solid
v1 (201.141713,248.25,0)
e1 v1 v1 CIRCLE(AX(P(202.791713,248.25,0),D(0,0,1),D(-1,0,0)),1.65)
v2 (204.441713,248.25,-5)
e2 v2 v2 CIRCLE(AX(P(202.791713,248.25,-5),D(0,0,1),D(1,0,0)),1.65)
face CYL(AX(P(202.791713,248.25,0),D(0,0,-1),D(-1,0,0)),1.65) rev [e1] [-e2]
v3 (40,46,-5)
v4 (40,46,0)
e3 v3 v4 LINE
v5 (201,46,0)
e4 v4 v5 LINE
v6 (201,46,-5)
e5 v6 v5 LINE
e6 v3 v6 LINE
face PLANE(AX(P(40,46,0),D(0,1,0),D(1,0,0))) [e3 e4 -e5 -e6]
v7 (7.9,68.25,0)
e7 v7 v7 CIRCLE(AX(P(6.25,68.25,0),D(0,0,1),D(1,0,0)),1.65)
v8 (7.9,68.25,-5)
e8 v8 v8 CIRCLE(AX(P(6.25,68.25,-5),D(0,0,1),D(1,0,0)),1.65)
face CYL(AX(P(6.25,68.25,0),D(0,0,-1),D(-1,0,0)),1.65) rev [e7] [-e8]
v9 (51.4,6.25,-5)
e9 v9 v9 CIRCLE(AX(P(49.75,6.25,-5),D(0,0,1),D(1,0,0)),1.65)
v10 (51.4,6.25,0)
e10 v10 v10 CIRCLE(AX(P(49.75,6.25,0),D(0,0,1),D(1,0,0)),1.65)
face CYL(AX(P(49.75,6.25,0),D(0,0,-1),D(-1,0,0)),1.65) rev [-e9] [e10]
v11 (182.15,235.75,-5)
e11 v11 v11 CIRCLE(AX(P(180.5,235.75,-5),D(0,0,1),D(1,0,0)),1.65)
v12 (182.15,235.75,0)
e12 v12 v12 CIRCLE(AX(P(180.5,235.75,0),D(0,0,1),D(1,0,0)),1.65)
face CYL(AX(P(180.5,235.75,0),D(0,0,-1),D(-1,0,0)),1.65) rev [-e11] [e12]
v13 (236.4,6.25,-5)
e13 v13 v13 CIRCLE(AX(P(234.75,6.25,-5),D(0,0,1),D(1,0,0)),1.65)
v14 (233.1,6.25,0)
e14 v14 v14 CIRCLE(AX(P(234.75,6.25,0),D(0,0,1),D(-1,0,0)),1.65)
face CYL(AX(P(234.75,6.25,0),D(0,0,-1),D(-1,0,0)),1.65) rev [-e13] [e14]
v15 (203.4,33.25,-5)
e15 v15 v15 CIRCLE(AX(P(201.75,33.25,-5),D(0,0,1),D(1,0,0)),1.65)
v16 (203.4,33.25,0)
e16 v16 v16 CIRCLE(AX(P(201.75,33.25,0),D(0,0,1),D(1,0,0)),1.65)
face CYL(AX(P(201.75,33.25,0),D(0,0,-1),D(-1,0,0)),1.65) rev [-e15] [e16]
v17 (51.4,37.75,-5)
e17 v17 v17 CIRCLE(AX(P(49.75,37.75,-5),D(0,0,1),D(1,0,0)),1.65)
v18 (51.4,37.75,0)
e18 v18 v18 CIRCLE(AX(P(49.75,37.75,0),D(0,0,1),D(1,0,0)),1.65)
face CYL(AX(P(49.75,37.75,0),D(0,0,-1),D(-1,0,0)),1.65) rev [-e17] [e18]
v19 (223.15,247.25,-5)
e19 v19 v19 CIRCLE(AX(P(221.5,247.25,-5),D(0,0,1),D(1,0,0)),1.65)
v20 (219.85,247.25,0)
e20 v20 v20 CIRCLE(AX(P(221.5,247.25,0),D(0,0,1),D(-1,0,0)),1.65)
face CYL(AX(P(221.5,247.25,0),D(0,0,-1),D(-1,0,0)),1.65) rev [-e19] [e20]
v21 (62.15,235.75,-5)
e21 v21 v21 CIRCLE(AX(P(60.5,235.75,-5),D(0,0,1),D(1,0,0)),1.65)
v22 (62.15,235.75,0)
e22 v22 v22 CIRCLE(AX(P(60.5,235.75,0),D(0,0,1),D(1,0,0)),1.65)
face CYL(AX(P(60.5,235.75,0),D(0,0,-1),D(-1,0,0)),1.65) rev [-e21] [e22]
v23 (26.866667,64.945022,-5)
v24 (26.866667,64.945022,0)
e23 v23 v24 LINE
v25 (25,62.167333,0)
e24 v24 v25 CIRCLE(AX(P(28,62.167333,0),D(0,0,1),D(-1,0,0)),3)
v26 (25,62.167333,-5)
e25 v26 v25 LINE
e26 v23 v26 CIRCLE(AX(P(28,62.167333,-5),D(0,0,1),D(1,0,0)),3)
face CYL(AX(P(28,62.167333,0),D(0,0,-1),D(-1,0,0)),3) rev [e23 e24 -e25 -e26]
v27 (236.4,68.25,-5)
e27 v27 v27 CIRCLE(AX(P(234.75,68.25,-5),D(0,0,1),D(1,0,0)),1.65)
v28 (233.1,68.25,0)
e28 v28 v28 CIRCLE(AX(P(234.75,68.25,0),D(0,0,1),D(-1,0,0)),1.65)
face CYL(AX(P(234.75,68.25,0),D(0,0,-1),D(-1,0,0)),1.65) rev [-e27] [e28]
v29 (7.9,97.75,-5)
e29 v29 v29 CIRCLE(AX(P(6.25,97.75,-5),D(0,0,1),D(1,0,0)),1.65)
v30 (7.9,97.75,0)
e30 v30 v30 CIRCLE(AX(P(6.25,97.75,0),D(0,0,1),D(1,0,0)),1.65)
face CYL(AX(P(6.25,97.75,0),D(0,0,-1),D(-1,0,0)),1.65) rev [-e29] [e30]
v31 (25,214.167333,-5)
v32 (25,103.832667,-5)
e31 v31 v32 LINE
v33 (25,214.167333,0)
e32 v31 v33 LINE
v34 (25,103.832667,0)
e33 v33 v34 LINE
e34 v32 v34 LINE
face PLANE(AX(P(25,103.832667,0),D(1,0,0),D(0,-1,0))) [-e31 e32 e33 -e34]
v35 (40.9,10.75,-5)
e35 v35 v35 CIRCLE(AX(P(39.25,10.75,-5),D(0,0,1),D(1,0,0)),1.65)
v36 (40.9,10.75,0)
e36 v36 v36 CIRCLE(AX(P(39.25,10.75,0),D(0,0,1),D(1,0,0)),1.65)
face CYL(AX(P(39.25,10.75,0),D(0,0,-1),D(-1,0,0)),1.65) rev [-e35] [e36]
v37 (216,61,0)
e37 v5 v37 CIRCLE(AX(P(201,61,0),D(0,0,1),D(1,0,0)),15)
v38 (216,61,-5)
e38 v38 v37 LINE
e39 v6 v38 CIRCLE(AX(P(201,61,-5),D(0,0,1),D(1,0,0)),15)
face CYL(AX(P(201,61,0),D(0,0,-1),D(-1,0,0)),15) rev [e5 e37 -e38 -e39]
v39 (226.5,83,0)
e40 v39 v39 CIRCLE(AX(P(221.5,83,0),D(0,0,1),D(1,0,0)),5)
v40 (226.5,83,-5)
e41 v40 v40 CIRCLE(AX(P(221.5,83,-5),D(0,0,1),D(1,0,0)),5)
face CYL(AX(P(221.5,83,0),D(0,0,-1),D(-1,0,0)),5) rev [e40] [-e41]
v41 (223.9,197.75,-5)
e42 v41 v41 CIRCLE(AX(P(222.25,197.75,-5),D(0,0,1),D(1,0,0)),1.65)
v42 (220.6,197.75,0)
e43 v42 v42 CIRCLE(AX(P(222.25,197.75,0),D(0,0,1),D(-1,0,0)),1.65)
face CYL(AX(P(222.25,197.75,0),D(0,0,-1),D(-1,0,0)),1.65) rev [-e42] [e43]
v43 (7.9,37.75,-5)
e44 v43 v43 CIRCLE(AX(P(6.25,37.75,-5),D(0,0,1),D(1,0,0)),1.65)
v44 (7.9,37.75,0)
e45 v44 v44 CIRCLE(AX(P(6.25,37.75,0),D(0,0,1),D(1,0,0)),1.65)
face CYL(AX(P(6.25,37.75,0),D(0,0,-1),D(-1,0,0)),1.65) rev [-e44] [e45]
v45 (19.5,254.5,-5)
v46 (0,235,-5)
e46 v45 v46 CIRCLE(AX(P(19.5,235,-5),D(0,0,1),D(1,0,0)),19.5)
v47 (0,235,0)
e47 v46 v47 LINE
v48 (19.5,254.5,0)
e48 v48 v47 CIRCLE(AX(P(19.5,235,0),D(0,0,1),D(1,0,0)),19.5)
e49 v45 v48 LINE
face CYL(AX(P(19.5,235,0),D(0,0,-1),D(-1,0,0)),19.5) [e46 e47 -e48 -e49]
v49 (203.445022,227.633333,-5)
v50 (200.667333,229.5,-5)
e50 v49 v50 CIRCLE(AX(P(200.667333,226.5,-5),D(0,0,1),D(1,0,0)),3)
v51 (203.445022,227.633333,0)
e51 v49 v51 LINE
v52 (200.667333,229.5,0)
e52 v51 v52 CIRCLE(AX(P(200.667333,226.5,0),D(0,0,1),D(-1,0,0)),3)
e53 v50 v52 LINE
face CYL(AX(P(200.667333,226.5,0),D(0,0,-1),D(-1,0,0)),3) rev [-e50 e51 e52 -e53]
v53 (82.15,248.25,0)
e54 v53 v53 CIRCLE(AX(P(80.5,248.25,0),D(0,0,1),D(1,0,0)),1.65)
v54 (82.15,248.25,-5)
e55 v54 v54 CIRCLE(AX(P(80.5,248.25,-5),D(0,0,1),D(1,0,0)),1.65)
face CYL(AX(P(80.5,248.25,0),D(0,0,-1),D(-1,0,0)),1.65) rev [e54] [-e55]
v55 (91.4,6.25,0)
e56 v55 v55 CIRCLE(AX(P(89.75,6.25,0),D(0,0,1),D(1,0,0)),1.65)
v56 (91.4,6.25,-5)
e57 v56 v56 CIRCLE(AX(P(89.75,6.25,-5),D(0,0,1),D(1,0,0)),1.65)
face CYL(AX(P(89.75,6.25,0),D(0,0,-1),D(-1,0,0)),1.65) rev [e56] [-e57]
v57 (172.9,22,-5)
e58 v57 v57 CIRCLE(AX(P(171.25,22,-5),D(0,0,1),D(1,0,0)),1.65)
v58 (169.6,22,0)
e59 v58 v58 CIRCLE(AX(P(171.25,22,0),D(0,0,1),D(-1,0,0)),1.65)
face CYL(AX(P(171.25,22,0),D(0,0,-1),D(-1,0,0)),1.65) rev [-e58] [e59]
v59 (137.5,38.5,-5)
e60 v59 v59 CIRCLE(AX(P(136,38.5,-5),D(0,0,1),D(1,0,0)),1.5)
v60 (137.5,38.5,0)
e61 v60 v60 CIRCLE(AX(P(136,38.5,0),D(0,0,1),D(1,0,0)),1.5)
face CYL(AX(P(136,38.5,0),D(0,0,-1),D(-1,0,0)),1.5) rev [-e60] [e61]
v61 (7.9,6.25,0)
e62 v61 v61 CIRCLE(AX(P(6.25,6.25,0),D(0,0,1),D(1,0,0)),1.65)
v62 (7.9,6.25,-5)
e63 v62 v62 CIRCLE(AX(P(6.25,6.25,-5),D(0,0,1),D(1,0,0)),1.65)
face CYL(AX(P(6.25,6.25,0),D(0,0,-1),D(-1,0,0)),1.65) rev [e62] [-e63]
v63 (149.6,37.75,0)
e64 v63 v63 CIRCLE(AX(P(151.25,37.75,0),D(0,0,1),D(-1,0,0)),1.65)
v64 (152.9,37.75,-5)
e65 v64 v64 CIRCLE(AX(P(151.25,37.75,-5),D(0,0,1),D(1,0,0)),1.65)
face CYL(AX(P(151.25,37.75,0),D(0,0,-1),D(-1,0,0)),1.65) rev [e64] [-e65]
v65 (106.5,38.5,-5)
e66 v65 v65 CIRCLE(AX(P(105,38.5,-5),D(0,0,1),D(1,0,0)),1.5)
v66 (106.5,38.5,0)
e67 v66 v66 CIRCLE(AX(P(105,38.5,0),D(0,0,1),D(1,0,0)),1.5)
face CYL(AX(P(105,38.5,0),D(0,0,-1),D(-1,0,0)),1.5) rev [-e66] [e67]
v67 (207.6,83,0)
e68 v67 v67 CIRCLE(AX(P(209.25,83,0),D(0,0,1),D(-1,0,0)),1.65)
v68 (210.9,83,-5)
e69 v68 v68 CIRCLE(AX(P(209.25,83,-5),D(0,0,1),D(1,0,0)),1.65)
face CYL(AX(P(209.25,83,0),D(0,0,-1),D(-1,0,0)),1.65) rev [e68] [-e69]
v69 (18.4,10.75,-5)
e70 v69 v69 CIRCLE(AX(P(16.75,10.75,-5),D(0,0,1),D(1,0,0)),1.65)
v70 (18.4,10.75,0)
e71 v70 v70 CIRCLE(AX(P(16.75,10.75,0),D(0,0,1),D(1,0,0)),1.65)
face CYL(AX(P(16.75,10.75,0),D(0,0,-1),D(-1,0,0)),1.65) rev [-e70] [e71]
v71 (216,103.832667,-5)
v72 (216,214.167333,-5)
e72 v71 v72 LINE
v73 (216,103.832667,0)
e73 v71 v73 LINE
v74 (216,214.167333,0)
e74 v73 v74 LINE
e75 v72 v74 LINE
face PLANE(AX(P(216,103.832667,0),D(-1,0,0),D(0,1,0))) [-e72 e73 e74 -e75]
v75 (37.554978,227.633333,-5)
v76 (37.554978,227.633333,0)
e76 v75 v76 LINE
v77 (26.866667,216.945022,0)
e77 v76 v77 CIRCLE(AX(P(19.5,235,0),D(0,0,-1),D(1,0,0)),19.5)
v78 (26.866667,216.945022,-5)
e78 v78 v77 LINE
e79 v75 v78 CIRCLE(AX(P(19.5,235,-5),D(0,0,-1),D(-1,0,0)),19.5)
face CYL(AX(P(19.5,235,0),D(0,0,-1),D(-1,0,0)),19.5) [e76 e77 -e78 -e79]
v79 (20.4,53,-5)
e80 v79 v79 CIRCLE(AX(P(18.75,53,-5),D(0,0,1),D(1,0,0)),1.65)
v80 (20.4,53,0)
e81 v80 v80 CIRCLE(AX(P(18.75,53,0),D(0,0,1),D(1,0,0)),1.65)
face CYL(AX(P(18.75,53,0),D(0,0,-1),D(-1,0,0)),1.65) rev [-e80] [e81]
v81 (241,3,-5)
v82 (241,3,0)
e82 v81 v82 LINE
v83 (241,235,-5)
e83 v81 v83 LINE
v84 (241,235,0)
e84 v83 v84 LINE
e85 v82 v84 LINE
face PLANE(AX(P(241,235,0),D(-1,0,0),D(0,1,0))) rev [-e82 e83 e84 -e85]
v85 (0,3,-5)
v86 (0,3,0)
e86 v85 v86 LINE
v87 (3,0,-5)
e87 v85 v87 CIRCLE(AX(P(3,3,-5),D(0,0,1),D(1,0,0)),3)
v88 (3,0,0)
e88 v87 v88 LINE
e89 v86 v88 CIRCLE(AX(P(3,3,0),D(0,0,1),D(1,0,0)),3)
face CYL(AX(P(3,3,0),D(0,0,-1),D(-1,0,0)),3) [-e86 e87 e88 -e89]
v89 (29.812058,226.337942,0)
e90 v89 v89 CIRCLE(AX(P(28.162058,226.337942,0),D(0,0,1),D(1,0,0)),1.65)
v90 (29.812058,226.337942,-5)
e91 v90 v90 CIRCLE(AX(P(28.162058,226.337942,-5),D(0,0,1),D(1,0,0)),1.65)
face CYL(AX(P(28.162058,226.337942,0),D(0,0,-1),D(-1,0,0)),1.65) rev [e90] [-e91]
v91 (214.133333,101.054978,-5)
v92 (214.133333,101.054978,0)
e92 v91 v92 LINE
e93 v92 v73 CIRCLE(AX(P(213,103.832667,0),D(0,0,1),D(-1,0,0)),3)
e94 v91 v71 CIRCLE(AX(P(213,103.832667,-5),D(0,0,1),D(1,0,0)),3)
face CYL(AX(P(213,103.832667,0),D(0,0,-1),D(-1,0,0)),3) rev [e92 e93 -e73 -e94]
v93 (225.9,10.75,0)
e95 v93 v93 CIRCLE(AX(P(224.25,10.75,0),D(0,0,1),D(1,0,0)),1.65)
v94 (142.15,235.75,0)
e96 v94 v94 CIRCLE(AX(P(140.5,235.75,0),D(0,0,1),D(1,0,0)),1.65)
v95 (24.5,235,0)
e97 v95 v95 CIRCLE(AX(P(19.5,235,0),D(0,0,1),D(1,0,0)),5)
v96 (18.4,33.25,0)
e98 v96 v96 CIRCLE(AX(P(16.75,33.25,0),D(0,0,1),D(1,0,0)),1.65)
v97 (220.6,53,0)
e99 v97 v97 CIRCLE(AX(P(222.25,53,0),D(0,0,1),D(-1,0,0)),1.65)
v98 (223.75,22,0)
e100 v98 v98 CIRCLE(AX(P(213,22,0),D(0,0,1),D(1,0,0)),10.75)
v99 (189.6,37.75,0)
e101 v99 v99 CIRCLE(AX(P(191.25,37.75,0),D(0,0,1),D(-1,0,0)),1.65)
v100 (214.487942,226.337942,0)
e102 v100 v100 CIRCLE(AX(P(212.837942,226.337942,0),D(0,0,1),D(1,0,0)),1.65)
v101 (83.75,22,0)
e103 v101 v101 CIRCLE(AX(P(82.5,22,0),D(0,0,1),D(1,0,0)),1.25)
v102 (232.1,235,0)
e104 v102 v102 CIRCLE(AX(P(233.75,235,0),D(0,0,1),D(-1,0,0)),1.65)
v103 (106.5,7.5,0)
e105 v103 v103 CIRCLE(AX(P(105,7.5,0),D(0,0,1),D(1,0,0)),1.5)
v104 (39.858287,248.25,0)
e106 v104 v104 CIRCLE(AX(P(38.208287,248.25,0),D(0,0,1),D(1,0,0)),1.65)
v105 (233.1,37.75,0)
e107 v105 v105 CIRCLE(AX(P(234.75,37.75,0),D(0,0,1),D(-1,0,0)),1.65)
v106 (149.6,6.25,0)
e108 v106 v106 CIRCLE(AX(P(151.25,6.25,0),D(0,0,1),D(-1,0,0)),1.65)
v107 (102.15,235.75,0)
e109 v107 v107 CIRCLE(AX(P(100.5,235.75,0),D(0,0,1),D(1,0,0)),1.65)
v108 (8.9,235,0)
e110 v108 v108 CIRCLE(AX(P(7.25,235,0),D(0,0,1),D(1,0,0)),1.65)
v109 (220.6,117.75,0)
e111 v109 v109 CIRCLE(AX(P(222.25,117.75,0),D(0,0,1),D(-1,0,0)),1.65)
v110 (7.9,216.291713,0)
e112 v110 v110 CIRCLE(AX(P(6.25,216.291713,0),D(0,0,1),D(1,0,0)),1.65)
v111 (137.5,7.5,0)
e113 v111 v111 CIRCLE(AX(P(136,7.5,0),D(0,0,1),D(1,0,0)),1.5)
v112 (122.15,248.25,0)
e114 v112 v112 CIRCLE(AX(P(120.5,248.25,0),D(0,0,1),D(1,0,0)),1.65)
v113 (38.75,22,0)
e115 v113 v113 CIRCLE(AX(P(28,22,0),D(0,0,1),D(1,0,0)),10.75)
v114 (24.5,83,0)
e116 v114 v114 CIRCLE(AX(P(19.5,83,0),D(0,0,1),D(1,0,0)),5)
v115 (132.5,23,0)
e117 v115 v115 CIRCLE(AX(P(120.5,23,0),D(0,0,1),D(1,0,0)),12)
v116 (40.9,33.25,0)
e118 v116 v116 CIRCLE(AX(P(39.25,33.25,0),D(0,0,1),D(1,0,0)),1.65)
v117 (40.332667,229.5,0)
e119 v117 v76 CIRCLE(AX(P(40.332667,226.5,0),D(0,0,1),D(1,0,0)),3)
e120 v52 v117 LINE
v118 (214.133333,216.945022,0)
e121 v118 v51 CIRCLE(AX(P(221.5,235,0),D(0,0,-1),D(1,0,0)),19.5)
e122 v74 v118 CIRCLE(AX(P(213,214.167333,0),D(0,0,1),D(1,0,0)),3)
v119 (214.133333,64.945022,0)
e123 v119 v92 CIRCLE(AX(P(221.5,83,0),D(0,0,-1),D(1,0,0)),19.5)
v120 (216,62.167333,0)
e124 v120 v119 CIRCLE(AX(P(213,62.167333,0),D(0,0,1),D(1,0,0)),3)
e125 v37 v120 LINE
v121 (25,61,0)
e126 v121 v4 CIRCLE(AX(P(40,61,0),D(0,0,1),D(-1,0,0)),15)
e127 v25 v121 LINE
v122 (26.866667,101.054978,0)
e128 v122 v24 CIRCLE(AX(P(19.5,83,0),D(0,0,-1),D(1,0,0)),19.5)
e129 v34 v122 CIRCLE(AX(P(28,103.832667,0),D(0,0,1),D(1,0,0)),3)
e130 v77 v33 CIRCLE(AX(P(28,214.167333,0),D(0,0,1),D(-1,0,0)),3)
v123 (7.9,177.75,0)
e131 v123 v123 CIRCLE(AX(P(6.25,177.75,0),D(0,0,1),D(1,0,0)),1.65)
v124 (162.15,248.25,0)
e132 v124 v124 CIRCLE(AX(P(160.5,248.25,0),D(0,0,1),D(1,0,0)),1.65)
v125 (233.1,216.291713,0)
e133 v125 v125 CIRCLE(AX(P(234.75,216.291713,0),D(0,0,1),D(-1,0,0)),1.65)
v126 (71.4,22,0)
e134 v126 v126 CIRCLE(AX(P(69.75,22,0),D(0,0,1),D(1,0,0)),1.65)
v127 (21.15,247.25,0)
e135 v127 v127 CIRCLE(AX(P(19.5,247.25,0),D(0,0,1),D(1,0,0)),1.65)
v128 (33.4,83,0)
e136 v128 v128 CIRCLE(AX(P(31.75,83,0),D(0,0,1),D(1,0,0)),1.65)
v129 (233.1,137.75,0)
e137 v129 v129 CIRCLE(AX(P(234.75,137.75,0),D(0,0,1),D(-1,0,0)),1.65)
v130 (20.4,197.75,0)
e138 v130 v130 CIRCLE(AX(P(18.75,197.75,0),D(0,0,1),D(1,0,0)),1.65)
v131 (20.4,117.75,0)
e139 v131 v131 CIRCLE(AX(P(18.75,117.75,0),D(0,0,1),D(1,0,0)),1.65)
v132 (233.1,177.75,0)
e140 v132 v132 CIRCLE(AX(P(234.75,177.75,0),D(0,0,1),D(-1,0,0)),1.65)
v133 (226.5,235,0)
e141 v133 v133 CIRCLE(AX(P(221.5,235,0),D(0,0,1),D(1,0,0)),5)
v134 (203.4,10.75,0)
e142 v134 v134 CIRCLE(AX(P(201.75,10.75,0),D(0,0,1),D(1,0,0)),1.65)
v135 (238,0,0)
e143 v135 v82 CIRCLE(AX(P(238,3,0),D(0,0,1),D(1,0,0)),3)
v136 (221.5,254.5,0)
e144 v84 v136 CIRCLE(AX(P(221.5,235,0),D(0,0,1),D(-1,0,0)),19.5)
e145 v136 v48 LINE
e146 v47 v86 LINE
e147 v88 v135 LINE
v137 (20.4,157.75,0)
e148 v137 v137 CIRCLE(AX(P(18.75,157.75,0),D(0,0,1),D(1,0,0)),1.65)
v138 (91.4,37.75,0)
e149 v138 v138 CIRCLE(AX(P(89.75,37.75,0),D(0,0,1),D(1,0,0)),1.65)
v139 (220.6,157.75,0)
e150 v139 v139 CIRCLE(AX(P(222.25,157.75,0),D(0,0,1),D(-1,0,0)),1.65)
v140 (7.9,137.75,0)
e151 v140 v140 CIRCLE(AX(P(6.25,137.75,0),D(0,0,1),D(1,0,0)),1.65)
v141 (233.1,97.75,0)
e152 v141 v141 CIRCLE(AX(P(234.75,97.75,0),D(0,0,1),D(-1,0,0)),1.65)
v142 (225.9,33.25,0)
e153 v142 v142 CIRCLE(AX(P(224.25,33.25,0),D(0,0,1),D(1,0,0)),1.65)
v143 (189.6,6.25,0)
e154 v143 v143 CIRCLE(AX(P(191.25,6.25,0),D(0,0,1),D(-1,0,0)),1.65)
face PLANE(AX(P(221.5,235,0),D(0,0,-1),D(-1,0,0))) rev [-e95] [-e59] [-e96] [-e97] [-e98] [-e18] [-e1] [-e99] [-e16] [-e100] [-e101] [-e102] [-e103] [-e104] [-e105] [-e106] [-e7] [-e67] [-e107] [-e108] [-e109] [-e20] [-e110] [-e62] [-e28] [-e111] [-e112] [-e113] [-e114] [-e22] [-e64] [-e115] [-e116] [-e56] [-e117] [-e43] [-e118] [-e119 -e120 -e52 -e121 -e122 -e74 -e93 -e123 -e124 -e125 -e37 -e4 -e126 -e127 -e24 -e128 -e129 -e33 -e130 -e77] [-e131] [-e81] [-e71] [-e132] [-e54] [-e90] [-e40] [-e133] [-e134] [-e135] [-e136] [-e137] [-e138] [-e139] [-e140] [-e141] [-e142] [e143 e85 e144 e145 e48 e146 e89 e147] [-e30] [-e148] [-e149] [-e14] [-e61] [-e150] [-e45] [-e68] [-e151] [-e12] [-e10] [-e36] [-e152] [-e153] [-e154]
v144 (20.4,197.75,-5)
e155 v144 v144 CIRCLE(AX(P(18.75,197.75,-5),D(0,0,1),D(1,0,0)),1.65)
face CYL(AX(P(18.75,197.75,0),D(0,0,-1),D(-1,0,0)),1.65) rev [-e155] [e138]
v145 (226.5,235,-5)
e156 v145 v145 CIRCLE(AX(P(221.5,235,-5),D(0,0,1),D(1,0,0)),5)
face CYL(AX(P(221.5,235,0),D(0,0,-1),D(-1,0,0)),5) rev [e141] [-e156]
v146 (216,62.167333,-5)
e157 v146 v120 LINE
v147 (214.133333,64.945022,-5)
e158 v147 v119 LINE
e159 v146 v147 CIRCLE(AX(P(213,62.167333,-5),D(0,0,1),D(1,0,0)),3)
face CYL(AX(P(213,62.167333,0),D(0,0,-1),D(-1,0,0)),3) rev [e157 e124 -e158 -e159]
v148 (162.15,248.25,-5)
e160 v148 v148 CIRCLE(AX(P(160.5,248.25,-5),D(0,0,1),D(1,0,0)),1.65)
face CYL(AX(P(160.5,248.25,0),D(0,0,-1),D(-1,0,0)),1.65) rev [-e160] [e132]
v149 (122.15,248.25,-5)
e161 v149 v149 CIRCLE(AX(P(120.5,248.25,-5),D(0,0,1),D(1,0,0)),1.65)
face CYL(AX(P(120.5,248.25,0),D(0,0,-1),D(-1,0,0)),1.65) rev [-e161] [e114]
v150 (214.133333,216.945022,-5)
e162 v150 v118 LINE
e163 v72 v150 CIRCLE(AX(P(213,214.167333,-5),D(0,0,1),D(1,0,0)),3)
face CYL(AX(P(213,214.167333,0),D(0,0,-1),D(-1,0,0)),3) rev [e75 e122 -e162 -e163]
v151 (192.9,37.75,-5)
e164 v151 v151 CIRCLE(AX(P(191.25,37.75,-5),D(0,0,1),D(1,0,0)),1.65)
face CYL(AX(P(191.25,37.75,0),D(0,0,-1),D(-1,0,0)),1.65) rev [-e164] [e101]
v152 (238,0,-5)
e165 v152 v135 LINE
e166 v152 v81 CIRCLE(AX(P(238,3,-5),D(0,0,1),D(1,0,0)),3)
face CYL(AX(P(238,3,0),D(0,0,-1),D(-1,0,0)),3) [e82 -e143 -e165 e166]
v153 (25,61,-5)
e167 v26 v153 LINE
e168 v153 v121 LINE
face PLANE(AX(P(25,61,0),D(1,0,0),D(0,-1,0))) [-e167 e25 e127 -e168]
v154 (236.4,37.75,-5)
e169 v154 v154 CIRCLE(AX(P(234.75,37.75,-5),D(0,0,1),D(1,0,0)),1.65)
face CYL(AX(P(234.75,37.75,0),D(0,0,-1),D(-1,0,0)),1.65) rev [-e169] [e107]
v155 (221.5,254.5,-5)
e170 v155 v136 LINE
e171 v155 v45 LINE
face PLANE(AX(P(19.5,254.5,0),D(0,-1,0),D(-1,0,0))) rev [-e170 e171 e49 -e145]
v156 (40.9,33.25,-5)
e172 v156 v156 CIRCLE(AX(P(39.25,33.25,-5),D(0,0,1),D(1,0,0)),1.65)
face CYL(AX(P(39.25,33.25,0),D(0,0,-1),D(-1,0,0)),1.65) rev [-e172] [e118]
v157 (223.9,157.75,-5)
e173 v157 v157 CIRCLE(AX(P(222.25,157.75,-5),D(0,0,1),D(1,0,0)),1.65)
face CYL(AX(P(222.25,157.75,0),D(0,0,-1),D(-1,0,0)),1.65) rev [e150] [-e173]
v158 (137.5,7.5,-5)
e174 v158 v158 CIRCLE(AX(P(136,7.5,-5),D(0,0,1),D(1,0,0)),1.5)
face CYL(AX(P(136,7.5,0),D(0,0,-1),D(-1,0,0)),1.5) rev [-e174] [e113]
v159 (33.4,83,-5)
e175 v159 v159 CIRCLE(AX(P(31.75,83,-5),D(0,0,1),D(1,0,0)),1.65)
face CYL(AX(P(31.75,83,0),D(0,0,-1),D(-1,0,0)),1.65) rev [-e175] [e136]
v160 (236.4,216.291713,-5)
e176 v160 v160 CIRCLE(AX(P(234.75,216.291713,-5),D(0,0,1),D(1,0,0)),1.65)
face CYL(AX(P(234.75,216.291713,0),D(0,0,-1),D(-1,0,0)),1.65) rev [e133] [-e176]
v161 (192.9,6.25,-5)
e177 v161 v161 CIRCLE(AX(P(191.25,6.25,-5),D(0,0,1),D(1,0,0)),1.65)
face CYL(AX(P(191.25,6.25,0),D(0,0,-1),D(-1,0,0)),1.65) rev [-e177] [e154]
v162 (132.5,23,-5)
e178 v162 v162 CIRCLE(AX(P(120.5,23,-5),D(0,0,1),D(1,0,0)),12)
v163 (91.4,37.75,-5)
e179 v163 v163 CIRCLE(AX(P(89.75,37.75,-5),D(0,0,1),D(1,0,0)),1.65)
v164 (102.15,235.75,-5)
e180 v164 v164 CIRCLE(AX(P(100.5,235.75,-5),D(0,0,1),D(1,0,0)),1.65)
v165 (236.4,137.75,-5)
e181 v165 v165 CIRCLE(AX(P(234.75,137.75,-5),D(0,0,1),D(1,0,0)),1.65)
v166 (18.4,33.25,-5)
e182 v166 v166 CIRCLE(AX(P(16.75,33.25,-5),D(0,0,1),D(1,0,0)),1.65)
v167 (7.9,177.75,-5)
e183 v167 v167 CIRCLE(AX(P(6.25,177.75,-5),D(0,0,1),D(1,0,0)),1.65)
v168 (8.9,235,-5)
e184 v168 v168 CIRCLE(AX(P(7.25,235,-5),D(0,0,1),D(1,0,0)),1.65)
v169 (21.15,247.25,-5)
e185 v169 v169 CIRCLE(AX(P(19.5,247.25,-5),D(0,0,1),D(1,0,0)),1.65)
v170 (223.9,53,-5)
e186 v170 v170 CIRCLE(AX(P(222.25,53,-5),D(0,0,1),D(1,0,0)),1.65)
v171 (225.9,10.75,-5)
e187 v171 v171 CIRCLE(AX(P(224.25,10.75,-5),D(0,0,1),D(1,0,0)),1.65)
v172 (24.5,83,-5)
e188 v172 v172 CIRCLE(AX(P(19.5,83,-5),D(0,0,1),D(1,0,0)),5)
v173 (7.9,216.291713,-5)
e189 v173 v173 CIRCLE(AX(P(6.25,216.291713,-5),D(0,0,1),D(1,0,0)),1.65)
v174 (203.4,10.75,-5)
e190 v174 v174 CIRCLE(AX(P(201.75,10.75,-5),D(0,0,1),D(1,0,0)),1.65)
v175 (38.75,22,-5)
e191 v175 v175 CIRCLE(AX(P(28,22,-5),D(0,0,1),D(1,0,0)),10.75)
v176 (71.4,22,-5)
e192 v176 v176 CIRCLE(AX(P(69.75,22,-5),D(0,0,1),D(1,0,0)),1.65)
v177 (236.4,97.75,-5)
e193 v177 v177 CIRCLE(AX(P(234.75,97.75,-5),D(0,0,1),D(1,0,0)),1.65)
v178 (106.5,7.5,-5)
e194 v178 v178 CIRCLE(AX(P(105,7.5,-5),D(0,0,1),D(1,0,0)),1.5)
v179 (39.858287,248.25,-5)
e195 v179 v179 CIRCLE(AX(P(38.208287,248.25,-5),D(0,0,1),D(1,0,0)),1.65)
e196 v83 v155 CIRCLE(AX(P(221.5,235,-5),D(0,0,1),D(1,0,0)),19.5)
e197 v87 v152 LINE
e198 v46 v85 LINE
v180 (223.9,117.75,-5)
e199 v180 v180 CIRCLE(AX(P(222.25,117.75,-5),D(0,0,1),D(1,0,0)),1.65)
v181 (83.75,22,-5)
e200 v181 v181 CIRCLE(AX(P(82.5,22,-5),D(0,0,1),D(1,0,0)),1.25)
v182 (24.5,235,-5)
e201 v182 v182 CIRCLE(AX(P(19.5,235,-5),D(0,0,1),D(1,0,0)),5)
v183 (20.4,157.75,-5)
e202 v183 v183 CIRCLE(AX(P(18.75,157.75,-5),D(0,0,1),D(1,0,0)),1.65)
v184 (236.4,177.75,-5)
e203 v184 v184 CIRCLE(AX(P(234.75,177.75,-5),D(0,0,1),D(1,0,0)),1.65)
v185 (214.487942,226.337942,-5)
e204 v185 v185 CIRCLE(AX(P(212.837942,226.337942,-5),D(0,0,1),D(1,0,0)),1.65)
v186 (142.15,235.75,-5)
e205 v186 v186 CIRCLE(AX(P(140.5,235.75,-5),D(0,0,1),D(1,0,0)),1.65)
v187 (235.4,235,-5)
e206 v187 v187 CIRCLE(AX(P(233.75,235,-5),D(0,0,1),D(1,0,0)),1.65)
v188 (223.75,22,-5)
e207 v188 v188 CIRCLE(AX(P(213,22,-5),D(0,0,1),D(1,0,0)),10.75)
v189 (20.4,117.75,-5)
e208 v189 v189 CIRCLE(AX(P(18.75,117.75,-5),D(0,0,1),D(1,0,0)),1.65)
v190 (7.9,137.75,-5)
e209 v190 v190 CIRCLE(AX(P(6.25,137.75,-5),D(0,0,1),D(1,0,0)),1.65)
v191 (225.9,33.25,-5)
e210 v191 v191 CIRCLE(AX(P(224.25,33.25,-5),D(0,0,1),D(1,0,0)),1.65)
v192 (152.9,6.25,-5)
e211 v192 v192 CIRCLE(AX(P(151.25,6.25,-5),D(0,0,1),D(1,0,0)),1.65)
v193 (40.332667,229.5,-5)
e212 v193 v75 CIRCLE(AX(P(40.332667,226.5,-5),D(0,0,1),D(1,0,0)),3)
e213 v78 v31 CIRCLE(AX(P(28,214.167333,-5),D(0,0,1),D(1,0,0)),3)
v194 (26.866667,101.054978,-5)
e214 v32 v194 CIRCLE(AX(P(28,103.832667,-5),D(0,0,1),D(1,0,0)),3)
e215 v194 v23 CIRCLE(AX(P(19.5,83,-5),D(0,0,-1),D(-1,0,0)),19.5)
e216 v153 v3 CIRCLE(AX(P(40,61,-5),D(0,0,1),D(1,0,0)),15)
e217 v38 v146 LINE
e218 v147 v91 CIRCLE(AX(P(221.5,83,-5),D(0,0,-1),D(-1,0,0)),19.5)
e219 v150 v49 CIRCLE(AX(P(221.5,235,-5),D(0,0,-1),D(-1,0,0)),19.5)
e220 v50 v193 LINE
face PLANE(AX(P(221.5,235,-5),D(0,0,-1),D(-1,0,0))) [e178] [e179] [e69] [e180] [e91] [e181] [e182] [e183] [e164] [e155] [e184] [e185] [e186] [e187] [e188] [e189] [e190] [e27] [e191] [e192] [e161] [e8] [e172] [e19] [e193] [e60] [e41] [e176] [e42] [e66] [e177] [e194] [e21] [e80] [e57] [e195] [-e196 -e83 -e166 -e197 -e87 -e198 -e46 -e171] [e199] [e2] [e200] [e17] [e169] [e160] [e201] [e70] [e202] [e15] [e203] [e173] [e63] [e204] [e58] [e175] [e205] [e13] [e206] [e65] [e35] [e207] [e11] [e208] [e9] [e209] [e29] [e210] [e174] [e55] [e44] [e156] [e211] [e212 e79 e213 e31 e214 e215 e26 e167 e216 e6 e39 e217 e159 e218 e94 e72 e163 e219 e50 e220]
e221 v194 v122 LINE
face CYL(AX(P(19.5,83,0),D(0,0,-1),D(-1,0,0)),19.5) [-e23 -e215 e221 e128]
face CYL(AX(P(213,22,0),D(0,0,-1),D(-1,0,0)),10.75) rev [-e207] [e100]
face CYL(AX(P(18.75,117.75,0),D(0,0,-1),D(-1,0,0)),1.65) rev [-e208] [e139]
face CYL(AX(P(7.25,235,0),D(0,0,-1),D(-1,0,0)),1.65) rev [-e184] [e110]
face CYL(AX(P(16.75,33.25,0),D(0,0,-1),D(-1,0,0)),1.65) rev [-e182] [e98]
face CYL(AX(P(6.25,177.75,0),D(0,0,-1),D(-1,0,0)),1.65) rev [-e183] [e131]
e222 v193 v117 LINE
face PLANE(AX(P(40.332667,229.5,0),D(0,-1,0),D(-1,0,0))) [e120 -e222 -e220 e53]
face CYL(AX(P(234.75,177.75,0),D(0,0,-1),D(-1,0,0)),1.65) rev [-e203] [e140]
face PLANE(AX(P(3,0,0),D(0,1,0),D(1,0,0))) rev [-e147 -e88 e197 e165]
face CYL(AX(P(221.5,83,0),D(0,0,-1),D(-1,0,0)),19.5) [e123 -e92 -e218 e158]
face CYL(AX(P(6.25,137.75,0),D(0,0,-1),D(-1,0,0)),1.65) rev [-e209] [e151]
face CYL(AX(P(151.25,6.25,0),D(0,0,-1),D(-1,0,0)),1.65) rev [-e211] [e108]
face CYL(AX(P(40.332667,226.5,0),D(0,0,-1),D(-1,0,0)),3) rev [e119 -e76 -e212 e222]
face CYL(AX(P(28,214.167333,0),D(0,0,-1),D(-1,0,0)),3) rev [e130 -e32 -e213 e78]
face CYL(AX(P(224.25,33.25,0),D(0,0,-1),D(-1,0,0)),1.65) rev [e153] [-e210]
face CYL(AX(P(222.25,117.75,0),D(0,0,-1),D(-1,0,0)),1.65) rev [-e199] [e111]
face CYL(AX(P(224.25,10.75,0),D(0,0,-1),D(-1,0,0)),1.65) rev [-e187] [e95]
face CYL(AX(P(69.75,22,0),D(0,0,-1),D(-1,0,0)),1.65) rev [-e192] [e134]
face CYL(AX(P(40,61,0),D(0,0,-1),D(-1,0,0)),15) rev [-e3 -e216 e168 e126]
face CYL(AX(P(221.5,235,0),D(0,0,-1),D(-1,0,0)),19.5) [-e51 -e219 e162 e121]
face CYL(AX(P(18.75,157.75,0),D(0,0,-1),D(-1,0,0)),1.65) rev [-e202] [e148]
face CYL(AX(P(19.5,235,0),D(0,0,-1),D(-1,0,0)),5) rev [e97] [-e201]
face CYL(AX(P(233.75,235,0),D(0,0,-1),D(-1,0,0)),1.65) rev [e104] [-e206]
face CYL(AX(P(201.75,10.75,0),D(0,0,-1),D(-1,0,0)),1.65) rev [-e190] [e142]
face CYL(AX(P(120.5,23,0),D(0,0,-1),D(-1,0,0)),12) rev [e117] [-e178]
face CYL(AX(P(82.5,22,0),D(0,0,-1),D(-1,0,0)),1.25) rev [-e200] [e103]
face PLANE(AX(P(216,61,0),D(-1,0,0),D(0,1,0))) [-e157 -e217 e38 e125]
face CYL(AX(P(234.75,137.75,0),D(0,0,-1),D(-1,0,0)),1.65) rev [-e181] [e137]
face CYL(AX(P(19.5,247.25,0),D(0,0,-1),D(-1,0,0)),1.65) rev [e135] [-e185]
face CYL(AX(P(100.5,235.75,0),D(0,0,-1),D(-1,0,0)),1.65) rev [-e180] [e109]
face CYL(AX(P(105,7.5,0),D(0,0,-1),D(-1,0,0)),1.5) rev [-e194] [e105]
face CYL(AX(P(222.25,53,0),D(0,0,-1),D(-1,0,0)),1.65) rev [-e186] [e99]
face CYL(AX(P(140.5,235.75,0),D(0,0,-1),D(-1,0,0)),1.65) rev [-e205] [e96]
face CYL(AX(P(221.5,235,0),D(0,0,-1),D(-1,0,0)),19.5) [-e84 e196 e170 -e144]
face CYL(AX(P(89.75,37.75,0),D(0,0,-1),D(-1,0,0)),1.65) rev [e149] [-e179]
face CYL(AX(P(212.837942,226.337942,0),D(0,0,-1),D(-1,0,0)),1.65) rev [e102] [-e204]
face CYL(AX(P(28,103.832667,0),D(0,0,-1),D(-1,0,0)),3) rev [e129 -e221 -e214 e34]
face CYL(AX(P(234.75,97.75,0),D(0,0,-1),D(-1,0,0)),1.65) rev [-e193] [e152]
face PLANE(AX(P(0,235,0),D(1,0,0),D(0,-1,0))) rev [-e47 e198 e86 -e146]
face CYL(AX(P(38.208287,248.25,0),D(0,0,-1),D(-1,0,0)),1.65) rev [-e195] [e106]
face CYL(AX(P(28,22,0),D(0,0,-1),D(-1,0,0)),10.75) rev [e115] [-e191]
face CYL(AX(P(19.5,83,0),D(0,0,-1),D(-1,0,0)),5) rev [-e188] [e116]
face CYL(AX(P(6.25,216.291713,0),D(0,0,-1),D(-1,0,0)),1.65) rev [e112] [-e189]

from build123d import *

# Parameters (mm, degrees)
CONVERT_SOLID1_START       = -5
CONVERT_SOLID1_OUTLINE_R   = 1.65
CONVERT_SOLID1_OUTLINE_R_2 = 10.75
CONVERT_SOLID1_OUTLINE_R_3 = 1.25
CONVERT_SOLID1_OUTLINE_R_4 = 1.5
CONVERT_SOLID1_OUTLINE_R_5 = 5
CONVERT_SOLID1_OUTLINE_R_6 = 12
CONVERT_SOLID1_DEPTH       = 5


# Read off the part's stored shape, not the designer's step: Convert-Solid1
with BuildPart() as part:
    # Convert-Solid1 outline → Convert-Solid1 (new body)
    with BuildSketch(Plane.XY.offset(CONVERT_SOLID1_START)):
        with BuildLine():
            ThreePointArc((19.5, 254.5), (5.711417767, 248.788582233), (0, 235))
            Line((0, 235), (0, 3))
            ThreePointArc((0, 3), (0.878679656, 0.878679656), (3, 0))
            Line((3, 0), (238, 0))
            ThreePointArc((238, 0), (240.121320344, 0.878679656), (241, 3))
            Line((241, 3), (241, 235))
            ThreePointArc((241, 235), (235.288582233, 248.788582233), (221.5, 254.5))
            Line((221.5, 254.5), (19.5, 254.5))
        make_face()
        with Locations((6.25, 6.25)):
            Circle(CONVERT_SOLID1_OUTLINE_R, mode=Mode.SUBTRACT)
        with Locations((16.75, 10.75)):
            Circle(CONVERT_SOLID1_OUTLINE_R, mode=Mode.SUBTRACT)
        with Locations((28, 22)):
            Circle(CONVERT_SOLID1_OUTLINE_R_2, mode=Mode.SUBTRACT)
        with Locations((39.25, 10.75)):
            Circle(CONVERT_SOLID1_OUTLINE_R, mode=Mode.SUBTRACT)
        with Locations((49.75, 6.25)):
            Circle(CONVERT_SOLID1_OUTLINE_R, mode=Mode.SUBTRACT)
        with Locations((6.25, 37.75)):
            Circle(CONVERT_SOLID1_OUTLINE_R, mode=Mode.SUBTRACT)
        with Locations((16.75, 33.25)):
            Circle(CONVERT_SOLID1_OUTLINE_R, mode=Mode.SUBTRACT)
        with Locations((18.75, 53)):
            Circle(CONVERT_SOLID1_OUTLINE_R, mode=Mode.SUBTRACT)
        with Locations((39.25, 33.25)):
            Circle(CONVERT_SOLID1_OUTLINE_R, mode=Mode.SUBTRACT)
        with Locations((49.75, 37.75)):
            Circle(CONVERT_SOLID1_OUTLINE_R, mode=Mode.SUBTRACT)
        with Locations((89.75, 6.25)):
            Circle(CONVERT_SOLID1_OUTLINE_R, mode=Mode.SUBTRACT)
        with Locations((69.75, 22)):
            Circle(CONVERT_SOLID1_OUTLINE_R, mode=Mode.SUBTRACT)
        with Locations((82.5, 22)):
            Circle(CONVERT_SOLID1_OUTLINE_R_3, mode=Mode.SUBTRACT)
        with Locations((105, 7.5)):
            Circle(CONVERT_SOLID1_OUTLINE_R_4, mode=Mode.SUBTRACT)
        with Locations((89.75, 37.75)):
            Circle(CONVERT_SOLID1_OUTLINE_R, mode=Mode.SUBTRACT)
        with Locations((105, 38.5)):
            Circle(CONVERT_SOLID1_OUTLINE_R_4, mode=Mode.SUBTRACT)
        with Locations((6.25, 68.25)):
            Circle(CONVERT_SOLID1_OUTLINE_R, mode=Mode.SUBTRACT)
        with Locations((19.5, 83)):
            Circle(CONVERT_SOLID1_OUTLINE_R_5, mode=Mode.SUBTRACT)
        with Locations((31.75, 83)):
            Circle(CONVERT_SOLID1_OUTLINE_R, mode=Mode.SUBTRACT)
        with Locations((6.25, 97.75)):
            Circle(CONVERT_SOLID1_OUTLINE_R, mode=Mode.SUBTRACT)
        with Locations((18.75, 117.75)):
            Circle(CONVERT_SOLID1_OUTLINE_R, mode=Mode.SUBTRACT)
        with Locations((136, 7.5)):
            Circle(CONVERT_SOLID1_OUTLINE_R_4, mode=Mode.SUBTRACT)
        with Locations((120.5, 23)):
            Circle(CONVERT_SOLID1_OUTLINE_R_6, mode=Mode.SUBTRACT)
        with Locations((151.25, 6.25)):
            Circle(CONVERT_SOLID1_OUTLINE_R, mode=Mode.SUBTRACT)
        with Locations((171.25, 22)):
            Circle(CONVERT_SOLID1_OUTLINE_R, mode=Mode.SUBTRACT)
        with Locations((136, 38.5)):
            Circle(CONVERT_SOLID1_OUTLINE_R_4, mode=Mode.SUBTRACT)
        with Locations((151.25, 37.75)):
            Circle(CONVERT_SOLID1_OUTLINE_R, mode=Mode.SUBTRACT)
        with Locations((191.25, 6.25)):
            Circle(CONVERT_SOLID1_OUTLINE_R, mode=Mode.SUBTRACT)
        with Locations((201.75, 10.75)):
            Circle(CONVERT_SOLID1_OUTLINE_R, mode=Mode.SUBTRACT)
        with Locations((224.25, 10.75)):
            Circle(CONVERT_SOLID1_OUTLINE_R, mode=Mode.SUBTRACT)
        with Locations((234.75, 6.25)):
            Circle(CONVERT_SOLID1_OUTLINE_R, mode=Mode.SUBTRACT)
        with Locations((213, 22)):
            Circle(CONVERT_SOLID1_OUTLINE_R_2, mode=Mode.SUBTRACT)
        with Locations((191.25, 37.75)):
            Circle(CONVERT_SOLID1_OUTLINE_R, mode=Mode.SUBTRACT)
        with Locations((201.75, 33.25)):
            Circle(CONVERT_SOLID1_OUTLINE_R, mode=Mode.SUBTRACT)
        with Locations((224.25, 33.25)):
            Circle(CONVERT_SOLID1_OUTLINE_R, mode=Mode.SUBTRACT)
        with Locations((234.75, 37.75)):
            Circle(CONVERT_SOLID1_OUTLINE_R, mode=Mode.SUBTRACT)
        with Locations((222.25, 53)):
            Circle(CONVERT_SOLID1_OUTLINE_R, mode=Mode.SUBTRACT)
        with Locations((209.25, 83)):
            Circle(CONVERT_SOLID1_OUTLINE_R, mode=Mode.SUBTRACT)
        with Locations((234.75, 68.25)):
            Circle(CONVERT_SOLID1_OUTLINE_R, mode=Mode.SUBTRACT)
        with Locations((221.5, 83)):
            Circle(CONVERT_SOLID1_OUTLINE_R_5, mode=Mode.SUBTRACT)
        with Locations((234.75, 97.75)):
            Circle(CONVERT_SOLID1_OUTLINE_R, mode=Mode.SUBTRACT)
        with Locations((222.25, 117.75)):
            Circle(CONVERT_SOLID1_OUTLINE_R, mode=Mode.SUBTRACT)
        with Locations((6.25, 137.75)):
            Circle(CONVERT_SOLID1_OUTLINE_R, mode=Mode.SUBTRACT)
        with Locations((18.75, 157.75)):
            Circle(CONVERT_SOLID1_OUTLINE_R, mode=Mode.SUBTRACT)
        with Locations((6.25, 177.75)):
            Circle(CONVERT_SOLID1_OUTLINE_R, mode=Mode.SUBTRACT)
        with Locations((18.75, 197.75)):
            Circle(CONVERT_SOLID1_OUTLINE_R, mode=Mode.SUBTRACT)
        with Locations((6.25, 216.291713066)):
            Circle(CONVERT_SOLID1_OUTLINE_R, mode=Mode.SUBTRACT)
        with Locations((7.25, 235)):
            Circle(CONVERT_SOLID1_OUTLINE_R, mode=Mode.SUBTRACT)
        with Locations((28.16205807, 226.33794193)):
            Circle(CONVERT_SOLID1_OUTLINE_R, mode=Mode.SUBTRACT)
        with Locations((19.5, 235)):
            Circle(CONVERT_SOLID1_OUTLINE_R_5, mode=Mode.SUBTRACT)
        with Locations((19.5, 247.25)):
            Circle(CONVERT_SOLID1_OUTLINE_R, mode=Mode.SUBTRACT)
        with Locations((38.208286934, 248.25)):
            Circle(CONVERT_SOLID1_OUTLINE_R, mode=Mode.SUBTRACT)
        with Locations((60.5, 235.75)):
            Circle(CONVERT_SOLID1_OUTLINE_R, mode=Mode.SUBTRACT)
        with Locations((80.5, 248.25)):
            Circle(CONVERT_SOLID1_OUTLINE_R, mode=Mode.SUBTRACT)
        with Locations((100.5, 235.75)):
            Circle(CONVERT_SOLID1_OUTLINE_R, mode=Mode.SUBTRACT)
        with BuildLine():
            Line((201, 46), (40, 46))
            ThreePointArc((40, 46), (29.393398282, 50.393398282), (25, 61))
            Line((25, 61), (25, 62.167333344))
            ThreePointArc((25, 62.167333344), (25.51002008, 63.840653397), (26.866666667, 64.945022231))
            ThreePointArc((26.866666667, 64.945022231), (39, 83), (26.866666667, 101.054977769))
            ThreePointArc((26.866666667, 101.054977769), (25.51002008, 102.159346603), (25, 103.832666656))
            Line((25, 103.832666656), (25, 214.167333344))
            ThreePointArc((25, 214.167333344), (25.51002008, 215.840653397), (26.866666667, 216.945022231))
            ThreePointArc((26.866666667, 216.945022231), (33.288582233, 221.211417767), (37.554977769, 227.633333333))
            ThreePointArc((37.554977769, 227.633333333), (38.659346603, 228.98997992), (40.332666656, 229.5))
            Line((40.332666656, 229.5), (200.667333344, 229.5))
            ThreePointArc((200.667333344, 229.5), (202.340653397, 228.98997992), (203.445022231, 227.633333333))
            ThreePointArc((203.445022231, 227.633333333), (207.711417767, 221.211417767), (214.133333333, 216.945022231))
            ThreePointArc((214.133333333, 216.945022231), (215.48997992, 215.840653397), (216, 214.167333344))
            Line((216, 214.167333344), (216, 103.832666656))
            ThreePointArc((216, 103.832666656), (215.48997992, 102.159346603), (214.133333333, 101.054977769))
            ThreePointArc((214.133333333, 101.054977769), (202, 83), (214.133333333, 64.945022231))
            ThreePointArc((214.133333333, 64.945022231), (215.48997992, 63.840653397), (216, 62.167333344))
            Line((216, 62.167333344), (216, 61))
            ThreePointArc((216, 61), (211.606601718, 50.393398282), (201, 46))
        make_face(mode=Mode.SUBTRACT)
        with Locations((234.75, 137.75)):
            Circle(CONVERT_SOLID1_OUTLINE_R, mode=Mode.SUBTRACT)
        with Locations((222.25, 157.75)):
            Circle(CONVERT_SOLID1_OUTLINE_R, mode=Mode.SUBTRACT)
        with Locations((234.75, 177.75)):
            Circle(CONVERT_SOLID1_OUTLINE_R, mode=Mode.SUBTRACT)
        with Locations((140.5, 235.75)):
            Circle(CONVERT_SOLID1_OUTLINE_R, mode=Mode.SUBTRACT)
        with Locations((120.5, 248.25)):
            Circle(CONVERT_SOLID1_OUTLINE_R, mode=Mode.SUBTRACT)
        with Locations((180.5, 235.75)):
            Circle(CONVERT_SOLID1_OUTLINE_R, mode=Mode.SUBTRACT)
        with Locations((160.5, 248.25)):
            Circle(CONVERT_SOLID1_OUTLINE_R, mode=Mode.SUBTRACT)
        with Locations((222.25, 197.75)):
            Circle(CONVERT_SOLID1_OUTLINE_R, mode=Mode.SUBTRACT)
        with Locations((234.75, 216.291713066)):
            Circle(CONVERT_SOLID1_OUTLINE_R, mode=Mode.SUBTRACT)
        with Locations((202.791713066, 248.25)):
            Circle(CONVERT_SOLID1_OUTLINE_R, mode=Mode.SUBTRACT)
        with Locations((212.83794193, 226.33794193)):
            Circle(CONVERT_SOLID1_OUTLINE_R, mode=Mode.SUBTRACT)
        with Locations((221.5, 235)):
            Circle(CONVERT_SOLID1_OUTLINE_R_5, mode=Mode.SUBTRACT)
        with Locations((233.75, 235)):
            Circle(CONVERT_SOLID1_OUTLINE_R, mode=Mode.SUBTRACT)
        with Locations((221.5, 247.25)):
            Circle(CONVERT_SOLID1_OUTLINE_R, mode=Mode.SUBTRACT)
    extrude(amount=CONVERT_SOLID1_DEPTH)


solid = part.part
